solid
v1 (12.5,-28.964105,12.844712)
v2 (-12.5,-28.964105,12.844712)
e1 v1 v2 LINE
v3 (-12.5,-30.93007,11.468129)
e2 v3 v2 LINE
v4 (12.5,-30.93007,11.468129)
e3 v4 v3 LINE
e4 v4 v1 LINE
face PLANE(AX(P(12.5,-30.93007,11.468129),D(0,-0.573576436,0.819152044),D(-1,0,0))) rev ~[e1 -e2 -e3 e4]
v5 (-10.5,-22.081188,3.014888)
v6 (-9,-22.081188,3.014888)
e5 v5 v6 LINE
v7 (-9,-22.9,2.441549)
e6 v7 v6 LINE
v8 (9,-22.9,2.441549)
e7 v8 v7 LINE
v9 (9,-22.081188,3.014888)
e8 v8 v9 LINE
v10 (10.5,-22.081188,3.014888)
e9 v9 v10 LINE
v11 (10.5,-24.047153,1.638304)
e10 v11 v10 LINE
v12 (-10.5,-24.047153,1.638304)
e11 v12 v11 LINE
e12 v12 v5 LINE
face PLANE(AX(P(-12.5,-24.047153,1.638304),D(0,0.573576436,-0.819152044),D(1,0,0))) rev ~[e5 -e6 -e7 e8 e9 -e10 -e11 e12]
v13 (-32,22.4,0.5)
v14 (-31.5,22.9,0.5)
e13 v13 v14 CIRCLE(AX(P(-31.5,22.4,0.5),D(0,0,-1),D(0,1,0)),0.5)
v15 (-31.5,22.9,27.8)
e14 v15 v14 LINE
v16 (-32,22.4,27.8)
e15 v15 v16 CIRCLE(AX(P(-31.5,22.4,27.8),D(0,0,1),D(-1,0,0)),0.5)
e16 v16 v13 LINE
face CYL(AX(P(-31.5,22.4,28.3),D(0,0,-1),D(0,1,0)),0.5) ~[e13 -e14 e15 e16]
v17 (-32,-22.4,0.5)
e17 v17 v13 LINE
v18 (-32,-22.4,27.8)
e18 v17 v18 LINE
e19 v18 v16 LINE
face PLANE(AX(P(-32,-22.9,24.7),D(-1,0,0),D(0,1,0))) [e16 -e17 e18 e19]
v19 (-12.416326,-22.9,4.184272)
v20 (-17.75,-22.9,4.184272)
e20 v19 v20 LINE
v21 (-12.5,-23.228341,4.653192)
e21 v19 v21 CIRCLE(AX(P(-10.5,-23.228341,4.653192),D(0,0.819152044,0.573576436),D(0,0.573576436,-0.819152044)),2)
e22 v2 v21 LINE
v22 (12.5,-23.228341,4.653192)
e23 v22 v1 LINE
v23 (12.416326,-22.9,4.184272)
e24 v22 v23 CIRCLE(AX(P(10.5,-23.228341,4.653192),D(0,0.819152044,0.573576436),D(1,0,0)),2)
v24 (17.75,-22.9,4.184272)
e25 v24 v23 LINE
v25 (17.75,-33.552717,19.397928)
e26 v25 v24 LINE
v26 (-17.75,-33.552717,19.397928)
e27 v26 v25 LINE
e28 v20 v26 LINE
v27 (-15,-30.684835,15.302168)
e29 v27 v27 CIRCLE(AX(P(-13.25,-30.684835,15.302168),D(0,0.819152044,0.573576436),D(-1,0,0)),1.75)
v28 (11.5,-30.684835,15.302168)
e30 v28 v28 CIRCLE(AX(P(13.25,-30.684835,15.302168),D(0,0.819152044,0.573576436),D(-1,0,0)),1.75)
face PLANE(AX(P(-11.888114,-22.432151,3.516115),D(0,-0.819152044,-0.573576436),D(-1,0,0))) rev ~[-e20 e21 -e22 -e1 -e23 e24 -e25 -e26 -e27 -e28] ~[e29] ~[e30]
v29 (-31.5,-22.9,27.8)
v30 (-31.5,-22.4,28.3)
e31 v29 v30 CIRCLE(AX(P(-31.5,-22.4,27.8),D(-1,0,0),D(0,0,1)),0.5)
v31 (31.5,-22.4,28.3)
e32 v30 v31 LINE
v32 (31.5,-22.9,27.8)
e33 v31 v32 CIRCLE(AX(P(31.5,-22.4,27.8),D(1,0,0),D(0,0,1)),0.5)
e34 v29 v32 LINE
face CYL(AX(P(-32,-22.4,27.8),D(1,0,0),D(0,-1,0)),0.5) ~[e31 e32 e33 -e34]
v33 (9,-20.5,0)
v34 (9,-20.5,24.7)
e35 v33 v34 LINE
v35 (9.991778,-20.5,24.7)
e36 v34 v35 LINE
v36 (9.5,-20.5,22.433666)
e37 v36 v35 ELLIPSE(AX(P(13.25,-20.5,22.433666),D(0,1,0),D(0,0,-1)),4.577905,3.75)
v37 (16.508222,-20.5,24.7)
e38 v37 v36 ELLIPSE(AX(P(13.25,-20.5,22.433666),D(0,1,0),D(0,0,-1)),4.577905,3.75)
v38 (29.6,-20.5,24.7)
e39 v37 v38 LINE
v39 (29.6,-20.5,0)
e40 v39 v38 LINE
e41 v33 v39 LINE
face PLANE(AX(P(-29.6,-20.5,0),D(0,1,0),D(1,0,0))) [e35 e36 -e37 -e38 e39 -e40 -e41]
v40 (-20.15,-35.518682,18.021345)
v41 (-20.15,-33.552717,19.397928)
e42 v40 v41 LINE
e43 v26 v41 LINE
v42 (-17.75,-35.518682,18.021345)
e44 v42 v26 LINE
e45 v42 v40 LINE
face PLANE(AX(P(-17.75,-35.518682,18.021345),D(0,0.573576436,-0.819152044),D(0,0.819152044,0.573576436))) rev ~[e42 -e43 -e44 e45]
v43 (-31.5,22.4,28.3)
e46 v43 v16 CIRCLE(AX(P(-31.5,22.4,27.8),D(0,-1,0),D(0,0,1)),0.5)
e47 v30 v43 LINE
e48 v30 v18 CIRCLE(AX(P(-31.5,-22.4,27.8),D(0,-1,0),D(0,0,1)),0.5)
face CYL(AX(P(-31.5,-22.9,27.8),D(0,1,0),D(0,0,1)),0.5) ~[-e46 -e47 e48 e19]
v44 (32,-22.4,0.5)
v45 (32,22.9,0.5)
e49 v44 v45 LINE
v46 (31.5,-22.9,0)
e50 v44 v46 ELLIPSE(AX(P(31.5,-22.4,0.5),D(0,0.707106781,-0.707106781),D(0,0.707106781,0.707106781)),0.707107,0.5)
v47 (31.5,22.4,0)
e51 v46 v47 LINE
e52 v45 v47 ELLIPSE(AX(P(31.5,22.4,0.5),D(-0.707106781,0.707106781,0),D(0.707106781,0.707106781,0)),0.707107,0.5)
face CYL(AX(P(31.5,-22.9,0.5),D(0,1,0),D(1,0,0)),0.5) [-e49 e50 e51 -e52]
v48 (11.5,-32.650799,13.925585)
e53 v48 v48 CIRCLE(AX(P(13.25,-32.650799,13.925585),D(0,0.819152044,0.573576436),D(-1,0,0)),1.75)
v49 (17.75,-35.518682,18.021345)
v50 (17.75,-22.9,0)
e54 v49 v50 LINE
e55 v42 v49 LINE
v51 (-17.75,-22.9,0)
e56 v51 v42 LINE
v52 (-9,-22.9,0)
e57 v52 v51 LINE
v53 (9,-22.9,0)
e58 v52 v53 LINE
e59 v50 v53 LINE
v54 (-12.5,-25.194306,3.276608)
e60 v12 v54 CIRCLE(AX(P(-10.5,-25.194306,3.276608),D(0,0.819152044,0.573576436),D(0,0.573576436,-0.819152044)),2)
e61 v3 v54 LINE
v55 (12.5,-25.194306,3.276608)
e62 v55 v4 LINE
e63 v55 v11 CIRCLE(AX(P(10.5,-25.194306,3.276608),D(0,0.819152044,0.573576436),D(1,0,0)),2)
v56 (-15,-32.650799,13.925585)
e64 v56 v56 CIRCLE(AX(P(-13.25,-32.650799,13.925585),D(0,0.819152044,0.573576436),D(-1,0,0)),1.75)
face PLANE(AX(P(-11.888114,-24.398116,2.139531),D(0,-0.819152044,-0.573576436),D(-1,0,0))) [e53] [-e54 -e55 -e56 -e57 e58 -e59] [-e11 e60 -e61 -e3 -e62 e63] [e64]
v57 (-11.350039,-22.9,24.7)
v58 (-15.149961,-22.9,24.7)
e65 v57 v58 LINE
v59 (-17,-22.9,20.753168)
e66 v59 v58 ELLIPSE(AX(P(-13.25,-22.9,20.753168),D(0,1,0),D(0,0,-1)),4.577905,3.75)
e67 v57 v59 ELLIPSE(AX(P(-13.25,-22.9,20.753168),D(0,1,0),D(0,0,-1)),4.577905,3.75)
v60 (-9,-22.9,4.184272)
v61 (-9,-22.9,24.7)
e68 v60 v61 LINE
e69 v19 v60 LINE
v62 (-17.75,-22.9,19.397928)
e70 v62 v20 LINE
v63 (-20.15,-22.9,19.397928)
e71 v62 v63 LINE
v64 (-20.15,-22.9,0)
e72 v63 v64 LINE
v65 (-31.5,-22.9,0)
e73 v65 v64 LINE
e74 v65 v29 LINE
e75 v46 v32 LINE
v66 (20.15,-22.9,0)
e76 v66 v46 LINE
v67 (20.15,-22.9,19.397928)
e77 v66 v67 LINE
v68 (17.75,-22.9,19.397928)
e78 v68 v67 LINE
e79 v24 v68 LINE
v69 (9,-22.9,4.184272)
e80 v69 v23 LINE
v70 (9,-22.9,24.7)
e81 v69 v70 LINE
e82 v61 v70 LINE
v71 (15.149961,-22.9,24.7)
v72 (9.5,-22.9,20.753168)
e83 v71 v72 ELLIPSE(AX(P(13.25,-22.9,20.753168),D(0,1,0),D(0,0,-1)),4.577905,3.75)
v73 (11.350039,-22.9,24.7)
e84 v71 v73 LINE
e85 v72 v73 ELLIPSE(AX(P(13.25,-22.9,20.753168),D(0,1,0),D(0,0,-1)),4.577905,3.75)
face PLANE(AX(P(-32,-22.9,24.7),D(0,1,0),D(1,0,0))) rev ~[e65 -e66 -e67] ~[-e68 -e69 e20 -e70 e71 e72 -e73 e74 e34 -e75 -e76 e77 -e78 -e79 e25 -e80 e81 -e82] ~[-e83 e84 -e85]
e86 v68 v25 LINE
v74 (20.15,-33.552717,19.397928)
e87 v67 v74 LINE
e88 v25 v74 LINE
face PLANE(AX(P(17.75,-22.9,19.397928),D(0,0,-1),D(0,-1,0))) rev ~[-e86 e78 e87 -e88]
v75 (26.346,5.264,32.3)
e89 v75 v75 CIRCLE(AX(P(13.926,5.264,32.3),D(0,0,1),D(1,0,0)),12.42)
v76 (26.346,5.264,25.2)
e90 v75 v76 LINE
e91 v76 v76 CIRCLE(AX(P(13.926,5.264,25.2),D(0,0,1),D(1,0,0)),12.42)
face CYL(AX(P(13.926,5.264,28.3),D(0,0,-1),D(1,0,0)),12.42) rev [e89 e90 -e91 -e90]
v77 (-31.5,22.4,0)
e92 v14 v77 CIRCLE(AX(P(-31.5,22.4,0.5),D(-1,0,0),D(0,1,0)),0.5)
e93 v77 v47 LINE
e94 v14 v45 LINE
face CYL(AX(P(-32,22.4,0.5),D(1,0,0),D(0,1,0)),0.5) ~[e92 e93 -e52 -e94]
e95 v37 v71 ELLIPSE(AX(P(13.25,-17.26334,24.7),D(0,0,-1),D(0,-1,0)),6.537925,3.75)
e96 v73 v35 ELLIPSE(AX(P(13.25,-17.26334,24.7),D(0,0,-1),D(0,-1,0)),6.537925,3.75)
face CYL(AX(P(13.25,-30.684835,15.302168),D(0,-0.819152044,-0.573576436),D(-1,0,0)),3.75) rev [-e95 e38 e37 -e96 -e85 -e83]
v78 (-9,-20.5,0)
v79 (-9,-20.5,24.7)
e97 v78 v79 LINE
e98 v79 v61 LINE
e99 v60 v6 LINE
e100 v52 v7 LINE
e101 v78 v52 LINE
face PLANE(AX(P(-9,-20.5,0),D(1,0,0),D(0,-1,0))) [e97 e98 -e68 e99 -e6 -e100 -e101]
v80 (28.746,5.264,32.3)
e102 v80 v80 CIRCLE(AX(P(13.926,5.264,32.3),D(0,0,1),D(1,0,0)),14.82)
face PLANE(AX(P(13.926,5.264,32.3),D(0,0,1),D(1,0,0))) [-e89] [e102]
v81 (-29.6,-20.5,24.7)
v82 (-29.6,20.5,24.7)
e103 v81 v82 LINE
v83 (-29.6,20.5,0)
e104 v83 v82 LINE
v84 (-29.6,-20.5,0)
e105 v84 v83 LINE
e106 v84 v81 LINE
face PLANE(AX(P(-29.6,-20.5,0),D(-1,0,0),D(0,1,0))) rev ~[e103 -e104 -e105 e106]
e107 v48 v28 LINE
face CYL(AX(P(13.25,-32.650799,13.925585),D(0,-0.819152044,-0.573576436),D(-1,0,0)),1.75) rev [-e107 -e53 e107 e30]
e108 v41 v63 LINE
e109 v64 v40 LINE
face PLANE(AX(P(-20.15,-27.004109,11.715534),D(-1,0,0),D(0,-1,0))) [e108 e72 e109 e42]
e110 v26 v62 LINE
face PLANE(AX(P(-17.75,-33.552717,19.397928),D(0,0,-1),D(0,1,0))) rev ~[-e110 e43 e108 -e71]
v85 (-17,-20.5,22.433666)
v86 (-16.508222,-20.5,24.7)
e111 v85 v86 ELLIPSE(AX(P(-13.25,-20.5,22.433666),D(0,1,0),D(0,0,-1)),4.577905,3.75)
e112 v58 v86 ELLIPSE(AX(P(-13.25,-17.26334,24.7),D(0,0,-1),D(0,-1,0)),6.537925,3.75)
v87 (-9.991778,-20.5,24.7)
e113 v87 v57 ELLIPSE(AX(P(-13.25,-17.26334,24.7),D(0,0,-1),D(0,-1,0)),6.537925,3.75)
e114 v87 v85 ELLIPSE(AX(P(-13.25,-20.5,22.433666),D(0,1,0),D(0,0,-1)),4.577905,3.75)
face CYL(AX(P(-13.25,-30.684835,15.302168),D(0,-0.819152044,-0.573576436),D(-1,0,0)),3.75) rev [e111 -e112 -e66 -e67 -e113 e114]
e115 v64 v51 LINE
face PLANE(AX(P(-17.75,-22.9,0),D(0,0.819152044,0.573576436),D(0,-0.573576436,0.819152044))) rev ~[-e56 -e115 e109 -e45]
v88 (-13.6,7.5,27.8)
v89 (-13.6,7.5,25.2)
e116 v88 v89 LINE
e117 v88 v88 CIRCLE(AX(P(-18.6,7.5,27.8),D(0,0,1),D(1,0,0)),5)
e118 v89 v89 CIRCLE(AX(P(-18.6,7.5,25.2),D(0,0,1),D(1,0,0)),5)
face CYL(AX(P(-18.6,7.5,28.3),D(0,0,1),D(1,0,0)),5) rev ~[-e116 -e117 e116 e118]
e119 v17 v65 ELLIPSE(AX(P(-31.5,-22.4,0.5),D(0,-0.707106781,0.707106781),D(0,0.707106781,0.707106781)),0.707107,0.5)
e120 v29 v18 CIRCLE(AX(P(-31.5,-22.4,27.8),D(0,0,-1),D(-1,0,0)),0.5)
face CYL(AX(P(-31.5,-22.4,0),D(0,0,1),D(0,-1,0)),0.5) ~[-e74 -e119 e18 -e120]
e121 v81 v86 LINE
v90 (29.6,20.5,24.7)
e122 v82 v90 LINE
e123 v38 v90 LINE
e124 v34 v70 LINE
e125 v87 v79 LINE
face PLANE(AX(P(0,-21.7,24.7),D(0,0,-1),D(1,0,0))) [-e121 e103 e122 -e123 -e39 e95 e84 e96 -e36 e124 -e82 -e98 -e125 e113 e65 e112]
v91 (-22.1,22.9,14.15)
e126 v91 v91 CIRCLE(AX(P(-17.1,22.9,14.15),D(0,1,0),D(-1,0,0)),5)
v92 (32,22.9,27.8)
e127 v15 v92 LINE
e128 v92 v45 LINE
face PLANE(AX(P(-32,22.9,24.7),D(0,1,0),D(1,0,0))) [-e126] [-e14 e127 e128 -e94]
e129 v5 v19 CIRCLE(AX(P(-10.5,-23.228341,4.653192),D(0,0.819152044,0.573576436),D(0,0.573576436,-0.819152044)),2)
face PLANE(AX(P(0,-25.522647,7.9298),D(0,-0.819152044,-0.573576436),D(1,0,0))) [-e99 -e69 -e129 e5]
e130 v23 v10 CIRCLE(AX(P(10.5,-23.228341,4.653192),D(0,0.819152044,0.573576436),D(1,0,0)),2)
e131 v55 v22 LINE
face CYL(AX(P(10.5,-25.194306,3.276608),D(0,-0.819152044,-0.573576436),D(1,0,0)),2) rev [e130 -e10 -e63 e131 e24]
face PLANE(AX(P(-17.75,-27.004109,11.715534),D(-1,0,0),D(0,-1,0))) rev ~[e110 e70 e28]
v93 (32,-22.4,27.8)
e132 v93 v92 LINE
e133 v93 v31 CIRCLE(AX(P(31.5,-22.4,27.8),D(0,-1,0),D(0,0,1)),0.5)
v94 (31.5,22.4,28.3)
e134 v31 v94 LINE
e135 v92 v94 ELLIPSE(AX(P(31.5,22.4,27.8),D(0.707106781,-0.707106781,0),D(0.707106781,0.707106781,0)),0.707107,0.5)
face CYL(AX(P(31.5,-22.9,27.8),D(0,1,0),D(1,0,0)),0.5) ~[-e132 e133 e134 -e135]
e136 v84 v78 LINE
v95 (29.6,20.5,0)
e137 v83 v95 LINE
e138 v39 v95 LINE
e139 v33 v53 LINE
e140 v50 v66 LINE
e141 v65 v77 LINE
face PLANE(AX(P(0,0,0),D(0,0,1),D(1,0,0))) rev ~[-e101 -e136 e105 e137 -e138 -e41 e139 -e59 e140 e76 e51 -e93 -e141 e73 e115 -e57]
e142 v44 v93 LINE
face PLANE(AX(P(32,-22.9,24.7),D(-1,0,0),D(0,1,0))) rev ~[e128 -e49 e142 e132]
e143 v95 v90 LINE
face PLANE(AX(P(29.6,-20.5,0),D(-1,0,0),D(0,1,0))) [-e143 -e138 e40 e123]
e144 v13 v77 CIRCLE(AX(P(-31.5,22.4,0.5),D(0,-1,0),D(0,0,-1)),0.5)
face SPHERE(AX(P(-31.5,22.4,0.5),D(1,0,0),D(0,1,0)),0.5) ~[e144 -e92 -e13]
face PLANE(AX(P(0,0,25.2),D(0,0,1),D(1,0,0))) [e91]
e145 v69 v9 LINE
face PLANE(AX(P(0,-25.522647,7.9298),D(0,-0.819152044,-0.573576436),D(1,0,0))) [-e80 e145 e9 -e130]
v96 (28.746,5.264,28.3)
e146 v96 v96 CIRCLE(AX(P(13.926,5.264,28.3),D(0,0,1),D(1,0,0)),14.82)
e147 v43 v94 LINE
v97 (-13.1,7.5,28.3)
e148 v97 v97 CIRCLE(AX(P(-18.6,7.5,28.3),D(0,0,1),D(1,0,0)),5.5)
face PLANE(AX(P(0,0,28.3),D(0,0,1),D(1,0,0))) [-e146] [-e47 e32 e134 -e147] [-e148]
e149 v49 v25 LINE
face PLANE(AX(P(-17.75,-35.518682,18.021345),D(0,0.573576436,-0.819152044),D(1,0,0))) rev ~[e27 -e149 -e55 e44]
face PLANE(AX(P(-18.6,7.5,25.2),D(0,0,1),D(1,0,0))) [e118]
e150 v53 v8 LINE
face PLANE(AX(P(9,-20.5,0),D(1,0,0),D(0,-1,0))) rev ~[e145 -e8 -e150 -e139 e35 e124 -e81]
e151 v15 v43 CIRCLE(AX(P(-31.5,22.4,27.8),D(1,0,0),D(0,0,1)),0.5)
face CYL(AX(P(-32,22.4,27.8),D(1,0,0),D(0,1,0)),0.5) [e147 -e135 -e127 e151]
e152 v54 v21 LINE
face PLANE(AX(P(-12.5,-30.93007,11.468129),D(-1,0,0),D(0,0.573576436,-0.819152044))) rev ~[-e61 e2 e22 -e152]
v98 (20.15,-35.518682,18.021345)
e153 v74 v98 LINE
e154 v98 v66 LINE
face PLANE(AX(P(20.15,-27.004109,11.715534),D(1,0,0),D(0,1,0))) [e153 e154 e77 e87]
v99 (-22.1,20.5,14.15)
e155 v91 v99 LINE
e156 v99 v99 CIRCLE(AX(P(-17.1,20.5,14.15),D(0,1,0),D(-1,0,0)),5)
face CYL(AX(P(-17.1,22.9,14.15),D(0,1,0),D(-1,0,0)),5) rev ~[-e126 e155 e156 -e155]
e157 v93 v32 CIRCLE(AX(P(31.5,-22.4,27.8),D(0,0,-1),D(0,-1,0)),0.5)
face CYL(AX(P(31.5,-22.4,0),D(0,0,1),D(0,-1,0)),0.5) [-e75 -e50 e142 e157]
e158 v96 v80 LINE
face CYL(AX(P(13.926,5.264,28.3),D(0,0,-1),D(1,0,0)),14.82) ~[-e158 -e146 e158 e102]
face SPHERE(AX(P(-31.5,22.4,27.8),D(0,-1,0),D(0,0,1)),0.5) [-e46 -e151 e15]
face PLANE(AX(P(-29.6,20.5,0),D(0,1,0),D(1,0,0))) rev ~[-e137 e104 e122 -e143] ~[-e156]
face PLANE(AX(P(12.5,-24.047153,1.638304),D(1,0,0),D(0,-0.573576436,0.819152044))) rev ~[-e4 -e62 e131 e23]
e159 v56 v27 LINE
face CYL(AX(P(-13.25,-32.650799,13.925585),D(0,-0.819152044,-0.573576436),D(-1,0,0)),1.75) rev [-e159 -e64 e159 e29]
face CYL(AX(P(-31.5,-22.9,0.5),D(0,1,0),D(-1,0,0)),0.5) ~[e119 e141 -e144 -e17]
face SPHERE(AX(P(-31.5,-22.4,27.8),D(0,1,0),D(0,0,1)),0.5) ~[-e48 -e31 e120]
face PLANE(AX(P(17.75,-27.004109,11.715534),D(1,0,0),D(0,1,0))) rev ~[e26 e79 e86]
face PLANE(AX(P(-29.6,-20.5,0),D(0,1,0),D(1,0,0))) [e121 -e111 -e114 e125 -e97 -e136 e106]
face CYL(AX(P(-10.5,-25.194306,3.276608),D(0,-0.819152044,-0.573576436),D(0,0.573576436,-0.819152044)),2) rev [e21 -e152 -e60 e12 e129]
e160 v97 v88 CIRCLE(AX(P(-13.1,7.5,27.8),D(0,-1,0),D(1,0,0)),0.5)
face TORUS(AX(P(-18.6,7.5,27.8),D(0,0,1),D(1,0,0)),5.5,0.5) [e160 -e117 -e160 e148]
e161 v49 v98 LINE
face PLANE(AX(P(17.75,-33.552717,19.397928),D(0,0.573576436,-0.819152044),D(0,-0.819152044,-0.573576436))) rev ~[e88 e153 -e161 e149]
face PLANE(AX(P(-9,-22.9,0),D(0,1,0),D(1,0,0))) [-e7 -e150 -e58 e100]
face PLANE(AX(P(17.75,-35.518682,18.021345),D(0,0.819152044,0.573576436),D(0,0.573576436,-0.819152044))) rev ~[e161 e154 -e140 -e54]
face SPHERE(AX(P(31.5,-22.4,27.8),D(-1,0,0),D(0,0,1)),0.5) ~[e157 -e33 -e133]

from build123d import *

# Parameters (mm, degrees)
F5_W         = 64
F5_H         = 45.8
F5_W_2       = 59.2
F5_H_2       = 41
F6_DEPTH     = 24.7
F7_W         = 64
F7_H         = 45.8
F7_W_2       = 59.2
F7_H_2       = 41
F8_DEPTH     = 3.6
F9_R         = 5
F10_DEPTH    = 3.1
F11_R        = 14.82
F11_R_2      = 12.42
F12_DEPTH    = 4
F13_DEPTH    = 3.1
F14_R        = 5
F15_DEPTH    = 2.4
F17_R        = 1.75
F18_DEPTH    = 2.4
F20_DEPTH    = 2.4
F22_DEPTH    = 2.4
F23_R        = 1.75
F24_REACH    = 60.9944299909
F25_R        = 0.5
F26_W        = 18
F26_H        = 2.4
F27_DEPTH    = 24.7
F28_R        = 3.75
F29_REACH    = 64.2512842404
F31_DEPTH    = 2.4
F32_T1_DEPTH = 2.4


# Not quite as in the source:
# - a fillet or chamfer that OpenCascade refuses, or shapes differently, is made with other operations: its cross-section is extruded or revolved along the edge and cut away or added
# - a feature names something its author has since deleted; it is built from what else it names


with BuildPart() as f6:
    # F5 (on Top) → F6 (new body)
    with BuildSketch(Plane.XY):
        Rectangle(F5_W, F5_H)
        Rectangle(F5_W_2, F5_H_2, mode=Mode.SUBTRACT)
    extrude(amount=F6_DEPTH)

    # F7 (on face) → F8 (join)
    with BuildSketch(Plane.XY.offset(24.7)):
        Rectangle(F7_W, F7_H)
        Rectangle(F7_W_2, F7_H_2, mode=Mode.SUBTRACT)
        Rectangle(F7_W_2, F7_H_2)
    extrude(amount=F8_DEPTH)

    # F9 (on face) → F10 (cut)
    with BuildSketch(Plane.XY.offset(28.3)):
        with Locations((-18.6, 7.5)):
            Circle(F9_R)
    extrude(amount=-F10_DEPTH, mode=Mode.SUBTRACT)

    # F11 (on face) → F12 (join)
    with BuildSketch(Plane.XY.offset(28.3)):
        with Locations((13.926, 5.264)):
            Circle(F11_R)
        with Locations((13.926, 5.264)):
            Circle(F11_R_2, mode=Mode.SUBTRACT)
    extrude(amount=F12_DEPTH)

    # F13 (cut): a face of the model
    f13_faces = [f6.faces().sort_by_distance(p)[0] for p in [
        (13.926, 5.264, 28.3),
    ]]
    extrude(f13_faces, amount=-F13_DEPTH, mode=Mode.SUBTRACT)

    # F14 (on face) → F15 (cut)
    with BuildSketch(Plane(origin=(0, 22.9, 0), x_dir=(-1, 0, 0), z_dir=(0, 1, 0))):
        with Locations((17.1, 14.15)):
            Circle(F14_R)
    extrude(amount=-F15_DEPTH, mode=Mode.SUBTRACT)

    # F17 (on face) → F18 (join)
    with BuildSketch(Plane(origin=(0, -15.3661306411, -10.759480508), x_dir=(-1, 0, 0), z_dir=(0, 0.8191520443, 0.5735764364))):
        Polygon((0, 24.1349003924), (0, 13.1349003924), (17.75, 13.1349003924), (17.75, 35.1349003924), (0, 35.1349003924), align=None)
        with Locations((13.25, 30.1349003924)):
            Circle(F17_R, mode=Mode.SUBTRACT)
        Polygon((-17.75, 13.1349003924), (0, 13.1349003924), (0, 24.1349003924), (0, 35.1349003924), (-17.75, 35.1349003924), align=None)
        with Locations((-13.25, 30.1349003924)):
            Circle(F17_R, mode=Mode.SUBTRACT)
    extrude(amount=F18_DEPTH)

    # F19 (on face) → F20 (join)
    with BuildSketch(Plane(origin=(-17.75, 0, 0), x_dir=(0, -1, 0), z_dir=(-1, 0, 0))):
        Polygon((22.9, 0), (35.5186815997, 18.0213449744), (33.5527166934, 19.3979284216), (22.9, 19.3979284216), align=None)
    extrude(amount=F20_DEPTH)

    # F21 (on face) → F22 (join)
    with BuildSketch(Plane.YZ.offset(17.75)):
        Polygon((-35.5186815997, 18.0213449744), (-22.9, 0), (-22.9, 19.3979284216), (-33.5527166934, 19.3979284216), align=None)
    extrude(amount=F22_DEPTH)

    f24_end = f6.faces().sort_by_distance((0, 0, 24.7))[0]
    # F23 (on face) → F24 (cut, up to a face of the model that its end follows)
    with BuildSketch(Plane(origin=(0, -15.3661306411, -10.759480508), x_dir=(1, 0, 0), z_dir=(0, -0.8191520443, -0.5735764364))):
        with Locations((-13.25, 30.1349003924)):
            Circle(F23_R)
        with Locations((13.25, 30.1349003924)):
            Circle(F23_R)
    f24_long = extrude(amount=-F24_REACH, mode=Mode.PRIVATE)
    add(split(f24_long, bisect_by=f24_end, keep=Keep.TOP, mode=Mode.PRIVATE), mode=Mode.SUBTRACT)

    # F25
    f25_edges = [f6.edges().sort_by_distance(p)[0] for p in [
        (-32, 0, 28.3),
        (0, -22.9, 28.3),
        (32, 0, 28.3),
        (0, 22.9, 28.3),
        (-23.6, 7.5, 28.3),
        (32, 0, 0),
        (0, 22.9, 0),
        (-32, 22.9, 14.15),
        (-32, 0, 0),
        (-32, -22.9, 14.15),
        (32, -22.9, 14.15),
    ]]
    fillet(f25_edges, radius=F25_R)

    # F26 (on face) → F27 (cut, through all)
    with BuildSketch(Plane(origin=(0, 0, 0), x_dir=(1, 0, 0), z_dir=(0, 0, -1))):
        with Locations((0, 21.7)):
            Rectangle(F26_W, F26_H)
    extrude(amount=-F27_DEPTH, mode=Mode.SUBTRACT)

    f29_end = Plane(origin=(0, -0.3794689119, 24.7), x_dir=(-1, 0, 0), z_dir=(0, 0, -1))
    # F28 (on face) → F29 (cut, up to a plane its end follows)
    with BuildSketch(Plane(origin=(0, -13.4001657348, -9.3828970608), x_dir=(-1, 0, 0), z_dir=(0, 0.8191520443, 0.5735764364))):
        with Locations((13.25, 30.1349003924)):
            Circle(F28_R)
        with Locations((-13.25, 30.1349003924)):
            Circle(F28_R)
    f29_long = extrude(amount=F29_REACH, mode=Mode.PRIVATE)
    add(split(f29_long, bisect_by=f29_end, keep=Keep.TOP, mode=Mode.PRIVATE), mode=Mode.SUBTRACT)

    # F30 (on face) → F31 (cut)
    with BuildSketch(Plane(origin=(0, -15.3661306411, -10.759480508), x_dir=(1, 0, 0), z_dir=(0, -0.8191520443, -0.5735764364))):
        Polygon((-12.5, 27.1349003924), (-12.5, 15.1349003924), (0, 15.1349003924), (12.5, 15.1349003924), (12.5, 27.1349003924), align=None)
    extrude(amount=-F31_DEPTH, mode=Mode.SUBTRACT)

    # F32: fillet of radius 2 on 2 edges, made by hand

    # F32_s2 → F32_t1 (join)
    with BuildSketch(Plane(origin=(0, -15.3661306411, -10.759480508), x_dir=(1, 0, 0), z_dir=(0, 0.8191520443, 0.5735764364))):
        with BuildLine():
            ThreePointArc((-10.5, -15.1349003924), (-11.9142135624, -15.7206868301), (-12.5, -17.1349003924))
            Line((-12.5, -17.1349003924), (-12.5, -15.1349003924))
            Line((-12.5, -15.1349003924), (-10.5, -15.1349003924))
        make_face()
        with BuildLine():
            ThreePointArc((12.5, -17.1349003924), (11.9142135624, -15.7206868301), (10.5, -15.1349003924))
            Line((10.5, -15.1349003924), (12.5, -15.1349003924))
            Line((12.5, -15.1349003924), (12.5, -17.1349003924))
        make_face()
    extrude(amount=F32_T1_DEPTH)


solid = f6.part
